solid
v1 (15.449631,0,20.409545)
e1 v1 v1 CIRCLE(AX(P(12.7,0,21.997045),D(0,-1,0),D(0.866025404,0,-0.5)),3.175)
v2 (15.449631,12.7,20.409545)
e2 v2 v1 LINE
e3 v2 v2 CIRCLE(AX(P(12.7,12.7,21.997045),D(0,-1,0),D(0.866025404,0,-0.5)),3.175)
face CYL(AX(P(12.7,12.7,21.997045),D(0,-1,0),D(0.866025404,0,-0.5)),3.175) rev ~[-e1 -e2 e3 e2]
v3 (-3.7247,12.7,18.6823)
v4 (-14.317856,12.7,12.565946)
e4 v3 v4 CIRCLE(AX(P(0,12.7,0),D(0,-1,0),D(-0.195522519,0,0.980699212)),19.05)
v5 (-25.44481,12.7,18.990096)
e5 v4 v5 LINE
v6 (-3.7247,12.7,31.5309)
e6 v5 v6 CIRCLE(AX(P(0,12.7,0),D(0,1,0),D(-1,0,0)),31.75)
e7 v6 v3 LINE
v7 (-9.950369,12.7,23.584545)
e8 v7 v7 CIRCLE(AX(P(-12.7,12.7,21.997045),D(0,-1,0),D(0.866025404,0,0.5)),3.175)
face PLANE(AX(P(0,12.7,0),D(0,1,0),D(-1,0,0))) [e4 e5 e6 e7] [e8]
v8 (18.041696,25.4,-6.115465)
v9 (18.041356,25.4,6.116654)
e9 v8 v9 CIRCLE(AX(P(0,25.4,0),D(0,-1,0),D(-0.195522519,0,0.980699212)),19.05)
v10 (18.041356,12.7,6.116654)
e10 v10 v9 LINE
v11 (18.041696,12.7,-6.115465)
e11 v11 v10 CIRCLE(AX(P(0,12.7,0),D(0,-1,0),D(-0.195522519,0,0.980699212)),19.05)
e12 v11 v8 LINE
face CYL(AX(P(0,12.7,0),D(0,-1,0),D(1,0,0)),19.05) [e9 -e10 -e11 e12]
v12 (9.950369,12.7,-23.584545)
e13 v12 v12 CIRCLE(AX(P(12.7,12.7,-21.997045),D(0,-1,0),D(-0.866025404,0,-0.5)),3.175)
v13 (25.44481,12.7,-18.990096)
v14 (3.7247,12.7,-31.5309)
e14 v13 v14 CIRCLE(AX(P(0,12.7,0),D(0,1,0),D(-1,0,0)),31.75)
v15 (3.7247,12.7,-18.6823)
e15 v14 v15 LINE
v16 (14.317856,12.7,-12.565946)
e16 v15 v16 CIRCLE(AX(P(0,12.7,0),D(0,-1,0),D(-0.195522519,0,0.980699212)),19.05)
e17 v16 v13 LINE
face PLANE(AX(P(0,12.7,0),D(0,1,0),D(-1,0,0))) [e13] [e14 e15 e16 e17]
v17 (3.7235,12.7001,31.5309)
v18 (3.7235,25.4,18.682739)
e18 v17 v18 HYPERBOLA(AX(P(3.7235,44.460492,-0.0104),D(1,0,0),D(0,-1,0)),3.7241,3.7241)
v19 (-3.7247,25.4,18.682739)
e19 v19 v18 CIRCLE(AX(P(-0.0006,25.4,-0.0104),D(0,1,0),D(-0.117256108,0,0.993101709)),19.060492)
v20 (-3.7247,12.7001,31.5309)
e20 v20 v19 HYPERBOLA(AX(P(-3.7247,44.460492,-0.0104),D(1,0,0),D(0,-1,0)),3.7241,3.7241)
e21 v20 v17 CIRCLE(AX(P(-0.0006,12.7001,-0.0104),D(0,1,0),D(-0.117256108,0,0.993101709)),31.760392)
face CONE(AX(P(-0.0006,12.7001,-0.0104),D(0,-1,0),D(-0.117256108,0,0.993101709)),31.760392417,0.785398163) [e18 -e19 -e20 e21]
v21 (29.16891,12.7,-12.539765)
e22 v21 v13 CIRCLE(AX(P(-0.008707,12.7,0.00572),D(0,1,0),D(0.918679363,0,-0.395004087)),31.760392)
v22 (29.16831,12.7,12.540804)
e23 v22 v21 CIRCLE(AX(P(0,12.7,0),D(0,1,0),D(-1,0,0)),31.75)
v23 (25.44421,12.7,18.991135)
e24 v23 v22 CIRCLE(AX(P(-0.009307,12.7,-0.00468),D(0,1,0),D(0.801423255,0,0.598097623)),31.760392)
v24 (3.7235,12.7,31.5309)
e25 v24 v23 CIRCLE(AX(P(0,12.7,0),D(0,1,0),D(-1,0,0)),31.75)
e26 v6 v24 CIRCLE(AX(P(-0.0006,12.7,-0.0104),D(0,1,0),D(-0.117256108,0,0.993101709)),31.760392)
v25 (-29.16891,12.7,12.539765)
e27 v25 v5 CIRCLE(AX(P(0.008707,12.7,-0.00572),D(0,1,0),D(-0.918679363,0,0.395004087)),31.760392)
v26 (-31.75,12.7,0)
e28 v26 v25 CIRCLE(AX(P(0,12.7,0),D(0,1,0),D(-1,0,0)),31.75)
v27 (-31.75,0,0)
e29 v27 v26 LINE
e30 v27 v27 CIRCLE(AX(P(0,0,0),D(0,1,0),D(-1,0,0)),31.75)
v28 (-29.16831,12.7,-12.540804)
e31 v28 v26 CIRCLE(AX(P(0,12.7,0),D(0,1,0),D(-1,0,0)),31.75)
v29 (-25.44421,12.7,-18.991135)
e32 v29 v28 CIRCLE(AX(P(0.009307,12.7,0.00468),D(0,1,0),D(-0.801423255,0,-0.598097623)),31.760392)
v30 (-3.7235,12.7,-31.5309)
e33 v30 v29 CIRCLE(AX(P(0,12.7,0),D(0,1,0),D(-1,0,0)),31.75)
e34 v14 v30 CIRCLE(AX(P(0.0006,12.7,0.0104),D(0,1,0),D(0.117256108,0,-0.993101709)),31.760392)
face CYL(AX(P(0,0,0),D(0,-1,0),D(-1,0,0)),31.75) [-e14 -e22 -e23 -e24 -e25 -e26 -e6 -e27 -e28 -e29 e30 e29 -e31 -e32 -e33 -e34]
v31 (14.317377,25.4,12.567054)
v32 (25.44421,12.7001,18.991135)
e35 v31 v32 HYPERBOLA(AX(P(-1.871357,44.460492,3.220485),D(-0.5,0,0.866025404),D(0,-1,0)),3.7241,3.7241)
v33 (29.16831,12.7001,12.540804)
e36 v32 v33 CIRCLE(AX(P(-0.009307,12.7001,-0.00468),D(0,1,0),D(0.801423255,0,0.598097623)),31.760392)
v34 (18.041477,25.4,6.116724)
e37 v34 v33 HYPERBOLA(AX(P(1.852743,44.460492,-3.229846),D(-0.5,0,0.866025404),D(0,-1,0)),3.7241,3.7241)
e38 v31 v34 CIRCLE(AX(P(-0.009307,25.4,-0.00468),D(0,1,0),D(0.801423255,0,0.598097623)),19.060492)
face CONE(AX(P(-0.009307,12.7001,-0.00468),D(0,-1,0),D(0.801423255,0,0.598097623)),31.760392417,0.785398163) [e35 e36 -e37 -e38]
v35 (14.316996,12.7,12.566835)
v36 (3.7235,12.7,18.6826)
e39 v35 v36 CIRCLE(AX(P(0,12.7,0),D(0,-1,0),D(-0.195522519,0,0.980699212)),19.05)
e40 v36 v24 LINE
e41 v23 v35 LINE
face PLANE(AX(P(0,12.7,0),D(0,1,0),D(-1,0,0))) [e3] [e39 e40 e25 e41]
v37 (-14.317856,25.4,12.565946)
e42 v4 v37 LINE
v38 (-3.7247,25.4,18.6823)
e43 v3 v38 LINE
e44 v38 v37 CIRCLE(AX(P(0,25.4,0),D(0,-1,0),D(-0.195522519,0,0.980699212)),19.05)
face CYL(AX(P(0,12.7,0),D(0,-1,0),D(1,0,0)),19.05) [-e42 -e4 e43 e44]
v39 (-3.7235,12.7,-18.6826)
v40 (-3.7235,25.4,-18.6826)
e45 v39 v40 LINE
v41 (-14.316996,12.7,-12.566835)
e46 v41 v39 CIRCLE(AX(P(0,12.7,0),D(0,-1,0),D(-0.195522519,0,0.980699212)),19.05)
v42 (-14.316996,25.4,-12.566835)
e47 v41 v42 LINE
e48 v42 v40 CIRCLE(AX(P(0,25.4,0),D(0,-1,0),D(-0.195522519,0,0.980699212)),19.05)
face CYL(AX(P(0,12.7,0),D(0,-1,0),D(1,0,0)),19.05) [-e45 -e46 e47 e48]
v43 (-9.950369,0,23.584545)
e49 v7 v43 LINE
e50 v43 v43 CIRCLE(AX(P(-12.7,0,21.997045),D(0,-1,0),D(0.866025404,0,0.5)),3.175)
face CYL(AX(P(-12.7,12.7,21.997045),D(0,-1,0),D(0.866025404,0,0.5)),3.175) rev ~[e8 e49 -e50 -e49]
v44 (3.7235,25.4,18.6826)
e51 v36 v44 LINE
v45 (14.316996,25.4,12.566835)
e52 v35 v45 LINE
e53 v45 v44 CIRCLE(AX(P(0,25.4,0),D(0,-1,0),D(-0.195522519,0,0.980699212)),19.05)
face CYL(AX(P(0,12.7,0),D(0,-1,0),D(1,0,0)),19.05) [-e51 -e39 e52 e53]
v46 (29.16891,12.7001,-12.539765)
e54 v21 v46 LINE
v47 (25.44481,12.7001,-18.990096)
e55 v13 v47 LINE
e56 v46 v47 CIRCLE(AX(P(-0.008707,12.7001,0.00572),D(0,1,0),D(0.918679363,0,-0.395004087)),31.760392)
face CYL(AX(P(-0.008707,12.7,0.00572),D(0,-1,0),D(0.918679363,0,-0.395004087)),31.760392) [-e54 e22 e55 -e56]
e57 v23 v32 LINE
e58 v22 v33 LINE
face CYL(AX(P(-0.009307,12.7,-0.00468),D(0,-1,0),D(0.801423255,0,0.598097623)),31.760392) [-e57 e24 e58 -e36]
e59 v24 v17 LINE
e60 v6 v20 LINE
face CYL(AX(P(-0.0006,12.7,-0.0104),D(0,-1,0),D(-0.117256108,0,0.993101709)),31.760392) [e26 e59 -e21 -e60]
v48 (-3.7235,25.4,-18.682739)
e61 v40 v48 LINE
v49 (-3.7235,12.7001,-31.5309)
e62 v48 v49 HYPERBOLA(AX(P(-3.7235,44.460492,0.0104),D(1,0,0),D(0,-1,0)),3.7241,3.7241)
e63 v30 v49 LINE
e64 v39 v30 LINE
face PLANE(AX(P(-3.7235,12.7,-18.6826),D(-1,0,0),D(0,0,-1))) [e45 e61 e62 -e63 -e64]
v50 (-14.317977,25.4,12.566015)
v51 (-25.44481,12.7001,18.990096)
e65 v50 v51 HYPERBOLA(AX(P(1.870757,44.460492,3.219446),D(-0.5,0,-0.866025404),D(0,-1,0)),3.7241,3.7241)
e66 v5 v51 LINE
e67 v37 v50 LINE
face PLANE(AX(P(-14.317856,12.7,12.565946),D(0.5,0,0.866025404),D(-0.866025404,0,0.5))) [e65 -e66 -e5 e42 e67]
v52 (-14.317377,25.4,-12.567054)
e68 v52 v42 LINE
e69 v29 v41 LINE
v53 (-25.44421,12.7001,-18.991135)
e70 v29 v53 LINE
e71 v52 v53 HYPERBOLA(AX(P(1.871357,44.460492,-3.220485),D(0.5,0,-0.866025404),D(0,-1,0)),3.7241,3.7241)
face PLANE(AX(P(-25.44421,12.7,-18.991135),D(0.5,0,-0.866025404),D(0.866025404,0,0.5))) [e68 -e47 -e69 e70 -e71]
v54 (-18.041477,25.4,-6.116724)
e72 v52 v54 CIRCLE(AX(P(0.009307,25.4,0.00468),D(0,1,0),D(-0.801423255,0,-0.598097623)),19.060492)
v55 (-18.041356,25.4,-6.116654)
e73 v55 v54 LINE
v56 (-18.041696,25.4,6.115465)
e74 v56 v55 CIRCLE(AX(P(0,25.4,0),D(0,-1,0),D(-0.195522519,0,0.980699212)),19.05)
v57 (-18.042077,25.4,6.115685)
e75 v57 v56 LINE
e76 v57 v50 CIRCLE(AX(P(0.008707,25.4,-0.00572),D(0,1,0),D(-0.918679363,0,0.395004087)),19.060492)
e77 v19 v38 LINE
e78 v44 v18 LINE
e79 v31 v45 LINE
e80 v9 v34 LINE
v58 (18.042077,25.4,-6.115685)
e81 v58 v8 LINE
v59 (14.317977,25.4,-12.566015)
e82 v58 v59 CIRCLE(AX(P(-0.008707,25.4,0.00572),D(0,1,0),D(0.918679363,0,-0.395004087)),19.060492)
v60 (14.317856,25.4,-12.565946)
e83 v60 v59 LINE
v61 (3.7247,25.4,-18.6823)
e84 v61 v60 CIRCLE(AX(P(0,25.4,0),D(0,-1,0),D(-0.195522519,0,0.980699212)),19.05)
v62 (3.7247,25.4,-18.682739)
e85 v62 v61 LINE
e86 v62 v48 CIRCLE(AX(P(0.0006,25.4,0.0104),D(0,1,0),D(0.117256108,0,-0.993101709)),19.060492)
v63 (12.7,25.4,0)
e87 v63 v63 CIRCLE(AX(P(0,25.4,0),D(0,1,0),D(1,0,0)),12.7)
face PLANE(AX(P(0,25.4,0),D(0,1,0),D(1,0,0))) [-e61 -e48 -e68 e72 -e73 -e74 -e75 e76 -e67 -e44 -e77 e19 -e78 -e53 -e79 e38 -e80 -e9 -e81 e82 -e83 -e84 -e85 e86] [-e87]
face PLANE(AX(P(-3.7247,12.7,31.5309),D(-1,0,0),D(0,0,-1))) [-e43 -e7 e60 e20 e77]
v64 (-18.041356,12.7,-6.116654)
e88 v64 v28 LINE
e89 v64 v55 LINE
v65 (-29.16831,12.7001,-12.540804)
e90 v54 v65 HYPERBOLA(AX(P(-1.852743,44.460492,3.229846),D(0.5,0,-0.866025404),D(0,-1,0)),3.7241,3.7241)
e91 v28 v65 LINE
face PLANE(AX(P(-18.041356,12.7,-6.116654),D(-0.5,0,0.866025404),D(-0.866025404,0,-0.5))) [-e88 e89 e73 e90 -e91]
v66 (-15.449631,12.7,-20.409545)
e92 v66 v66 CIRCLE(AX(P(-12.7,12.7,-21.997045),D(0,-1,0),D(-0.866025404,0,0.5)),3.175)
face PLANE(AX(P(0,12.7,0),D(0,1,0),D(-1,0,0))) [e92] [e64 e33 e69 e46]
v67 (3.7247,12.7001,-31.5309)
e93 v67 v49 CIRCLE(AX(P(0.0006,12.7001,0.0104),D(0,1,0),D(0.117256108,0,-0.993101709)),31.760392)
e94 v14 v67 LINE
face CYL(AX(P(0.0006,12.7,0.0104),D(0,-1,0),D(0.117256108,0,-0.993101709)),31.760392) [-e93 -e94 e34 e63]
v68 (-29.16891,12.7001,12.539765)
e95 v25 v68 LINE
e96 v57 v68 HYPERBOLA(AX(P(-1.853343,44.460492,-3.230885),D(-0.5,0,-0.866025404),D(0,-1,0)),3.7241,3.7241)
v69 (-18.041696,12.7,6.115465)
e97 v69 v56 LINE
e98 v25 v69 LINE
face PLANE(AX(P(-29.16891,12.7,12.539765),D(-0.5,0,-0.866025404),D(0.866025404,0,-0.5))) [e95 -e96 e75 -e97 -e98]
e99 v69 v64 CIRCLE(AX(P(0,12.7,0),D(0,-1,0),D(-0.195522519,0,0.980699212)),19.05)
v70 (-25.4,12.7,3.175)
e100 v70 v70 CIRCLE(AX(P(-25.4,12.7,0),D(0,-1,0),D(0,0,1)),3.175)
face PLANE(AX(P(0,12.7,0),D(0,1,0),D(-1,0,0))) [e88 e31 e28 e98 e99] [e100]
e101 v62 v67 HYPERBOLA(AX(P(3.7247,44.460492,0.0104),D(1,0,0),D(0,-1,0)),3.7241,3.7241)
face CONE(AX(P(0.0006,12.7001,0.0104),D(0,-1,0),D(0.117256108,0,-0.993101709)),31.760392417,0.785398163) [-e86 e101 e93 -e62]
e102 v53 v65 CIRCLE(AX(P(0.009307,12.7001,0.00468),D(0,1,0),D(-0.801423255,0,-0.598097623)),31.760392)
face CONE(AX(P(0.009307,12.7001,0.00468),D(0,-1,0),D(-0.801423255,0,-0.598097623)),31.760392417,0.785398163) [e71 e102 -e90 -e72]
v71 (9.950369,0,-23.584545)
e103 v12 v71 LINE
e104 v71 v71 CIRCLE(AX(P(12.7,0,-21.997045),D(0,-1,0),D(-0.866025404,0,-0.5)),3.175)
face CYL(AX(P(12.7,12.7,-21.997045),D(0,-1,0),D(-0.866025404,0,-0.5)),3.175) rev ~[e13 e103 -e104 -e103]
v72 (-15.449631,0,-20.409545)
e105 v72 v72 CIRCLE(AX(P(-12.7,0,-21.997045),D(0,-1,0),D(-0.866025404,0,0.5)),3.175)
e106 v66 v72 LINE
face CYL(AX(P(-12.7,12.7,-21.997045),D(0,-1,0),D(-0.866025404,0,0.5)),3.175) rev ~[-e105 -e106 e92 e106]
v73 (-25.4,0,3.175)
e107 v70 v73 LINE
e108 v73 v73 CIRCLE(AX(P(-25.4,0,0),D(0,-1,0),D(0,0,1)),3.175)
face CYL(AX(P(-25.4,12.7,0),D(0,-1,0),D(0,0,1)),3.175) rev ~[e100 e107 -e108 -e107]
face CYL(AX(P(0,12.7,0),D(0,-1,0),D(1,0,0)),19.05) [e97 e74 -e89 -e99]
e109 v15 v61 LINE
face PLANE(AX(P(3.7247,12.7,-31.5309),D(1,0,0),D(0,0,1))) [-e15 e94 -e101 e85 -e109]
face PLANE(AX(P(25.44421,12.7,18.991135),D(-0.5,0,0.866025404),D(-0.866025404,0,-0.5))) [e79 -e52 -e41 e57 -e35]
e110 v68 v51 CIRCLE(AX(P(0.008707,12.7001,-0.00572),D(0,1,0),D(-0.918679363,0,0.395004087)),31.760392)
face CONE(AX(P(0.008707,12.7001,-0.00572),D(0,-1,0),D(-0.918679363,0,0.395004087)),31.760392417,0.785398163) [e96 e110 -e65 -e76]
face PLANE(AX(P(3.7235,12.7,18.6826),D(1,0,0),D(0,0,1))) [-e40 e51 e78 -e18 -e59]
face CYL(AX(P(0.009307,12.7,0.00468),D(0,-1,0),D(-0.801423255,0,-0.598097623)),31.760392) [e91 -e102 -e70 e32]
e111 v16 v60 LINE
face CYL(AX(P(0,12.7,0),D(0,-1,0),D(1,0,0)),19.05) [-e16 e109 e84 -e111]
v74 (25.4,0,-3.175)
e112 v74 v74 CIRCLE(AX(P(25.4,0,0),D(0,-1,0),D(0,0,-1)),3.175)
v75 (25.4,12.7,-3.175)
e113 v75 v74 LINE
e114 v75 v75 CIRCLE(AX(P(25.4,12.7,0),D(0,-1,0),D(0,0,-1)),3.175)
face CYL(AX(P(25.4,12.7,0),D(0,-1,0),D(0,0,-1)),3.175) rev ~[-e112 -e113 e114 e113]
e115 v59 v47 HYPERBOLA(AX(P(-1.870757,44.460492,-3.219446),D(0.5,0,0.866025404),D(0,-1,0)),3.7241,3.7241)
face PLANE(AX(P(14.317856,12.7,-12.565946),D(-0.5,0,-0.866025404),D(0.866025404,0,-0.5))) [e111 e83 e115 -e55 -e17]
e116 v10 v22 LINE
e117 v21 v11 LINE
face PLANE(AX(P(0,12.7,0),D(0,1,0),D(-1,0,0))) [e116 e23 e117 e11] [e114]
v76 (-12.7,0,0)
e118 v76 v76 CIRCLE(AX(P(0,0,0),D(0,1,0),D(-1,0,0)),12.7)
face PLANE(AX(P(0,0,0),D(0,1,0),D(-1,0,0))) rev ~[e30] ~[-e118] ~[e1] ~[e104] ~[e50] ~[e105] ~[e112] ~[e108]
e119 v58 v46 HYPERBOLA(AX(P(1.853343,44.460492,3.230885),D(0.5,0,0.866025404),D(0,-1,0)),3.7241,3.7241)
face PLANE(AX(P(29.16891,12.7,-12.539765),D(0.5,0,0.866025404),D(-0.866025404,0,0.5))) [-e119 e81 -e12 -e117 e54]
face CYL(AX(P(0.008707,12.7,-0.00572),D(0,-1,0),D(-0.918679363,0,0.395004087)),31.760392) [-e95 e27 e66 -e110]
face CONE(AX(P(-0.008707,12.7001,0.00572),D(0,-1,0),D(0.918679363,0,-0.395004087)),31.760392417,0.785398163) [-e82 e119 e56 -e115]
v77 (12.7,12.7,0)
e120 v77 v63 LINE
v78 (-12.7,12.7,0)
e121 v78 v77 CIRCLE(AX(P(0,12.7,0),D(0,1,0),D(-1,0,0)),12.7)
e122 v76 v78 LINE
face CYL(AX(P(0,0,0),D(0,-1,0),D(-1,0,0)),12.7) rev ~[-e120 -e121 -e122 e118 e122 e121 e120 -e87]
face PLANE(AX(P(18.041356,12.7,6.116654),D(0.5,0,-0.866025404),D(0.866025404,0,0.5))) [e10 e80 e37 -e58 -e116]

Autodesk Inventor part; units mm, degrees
ref_plane "YZ Plane" through (0, 0, 0) normal (1, 0, 0) x (0, 1, 0)
ref_plane "XZ Plane" through (0, 0, 0) normal (0, 1, 0) x (-1, 0, 0)
ref_plane "XY Plane" through (0, 0, 0) normal (0, 0, 1) x (1, 0, 0)
sketch "Sketch1" plane through (0, 0, 0) normal (0, 1, 0) x (-1, 0, 0)
  circle A0 centre (0, 0) radius 12.7
  circle A1 centre (0, 0) radius 31.75
  dimension "d0" = 25.4
  dimension "d1" = 63.5
extrude "Extrusion1" add sketch "Sketch1" along normal blind 12.7
sketch "Sketch2" plane through (0, 12.7, 0) normal (0, 1, 0) x (1, 0, 0)
  circle A0 centre (0, 0) radius 19.05
  circle A1 centre (0, 0) radius 31.75 construction
  line L0 (-31.75, 0) -> (-19.05, 0) construction
  circle A2 centre (-25.4, 0) radius 2.5473
  circle A3 centre (0, 0) radius 12.7 projected
  dimension "d5" = 38.1
extrude "Extrusion2" add sketch "Sketch2" along normal blind 12.7 contours A0
sketch "Sketch3" plane through (0, 12.7, 0) normal (0, 1, 0) x (1, 0, 0)
  line L0 (-31.75, 0) -> (-19.05, 0) construction
  circle A0 centre (-25.4, 0) radius 2.5473 projected
  point P0 (0, 0)
hole "Hole1" at (-25.4, 12.7, 0) direction (0, -1, 0) diameter 6.35 end through all
pattern_circular "Circular Pattern1" count 6 over 360 about axis through (0, 0, 0) along (0, 1, 0) of "Hole1"
sketch "Sketch4" plane through (0, 12.7, 0) normal (0, 1, 0) x (1, 0, 0)
  circle A0 centre (0, 0) radius 19.05 projected
  line L0 (3.7235, -18.6826) -> (3.7235, -31.5309)
  arc A1 (-3.7247, -31.5309) -> (3.7235, -31.5309) centre (-0.0006, 0.0104) ccw
  line L1 (-3.7247, -31.5309) -> (-3.7247, -18.6823)
extrude "Extrusion3" add sketch "Sketch4" along normal blind 12.7 contours A0 L0 A1 L1
chamfer "Chamfer1" distance 12.7 angle 45 1 edges at (-0.0006, 25.4, 31.75)
pattern_circular "Circular Pattern2" count 6 over 360 about axis through (0, 0, 0) along (0, 1, 0) of "Extrusion3", "Chamfer1"
properties part number "pegg"
